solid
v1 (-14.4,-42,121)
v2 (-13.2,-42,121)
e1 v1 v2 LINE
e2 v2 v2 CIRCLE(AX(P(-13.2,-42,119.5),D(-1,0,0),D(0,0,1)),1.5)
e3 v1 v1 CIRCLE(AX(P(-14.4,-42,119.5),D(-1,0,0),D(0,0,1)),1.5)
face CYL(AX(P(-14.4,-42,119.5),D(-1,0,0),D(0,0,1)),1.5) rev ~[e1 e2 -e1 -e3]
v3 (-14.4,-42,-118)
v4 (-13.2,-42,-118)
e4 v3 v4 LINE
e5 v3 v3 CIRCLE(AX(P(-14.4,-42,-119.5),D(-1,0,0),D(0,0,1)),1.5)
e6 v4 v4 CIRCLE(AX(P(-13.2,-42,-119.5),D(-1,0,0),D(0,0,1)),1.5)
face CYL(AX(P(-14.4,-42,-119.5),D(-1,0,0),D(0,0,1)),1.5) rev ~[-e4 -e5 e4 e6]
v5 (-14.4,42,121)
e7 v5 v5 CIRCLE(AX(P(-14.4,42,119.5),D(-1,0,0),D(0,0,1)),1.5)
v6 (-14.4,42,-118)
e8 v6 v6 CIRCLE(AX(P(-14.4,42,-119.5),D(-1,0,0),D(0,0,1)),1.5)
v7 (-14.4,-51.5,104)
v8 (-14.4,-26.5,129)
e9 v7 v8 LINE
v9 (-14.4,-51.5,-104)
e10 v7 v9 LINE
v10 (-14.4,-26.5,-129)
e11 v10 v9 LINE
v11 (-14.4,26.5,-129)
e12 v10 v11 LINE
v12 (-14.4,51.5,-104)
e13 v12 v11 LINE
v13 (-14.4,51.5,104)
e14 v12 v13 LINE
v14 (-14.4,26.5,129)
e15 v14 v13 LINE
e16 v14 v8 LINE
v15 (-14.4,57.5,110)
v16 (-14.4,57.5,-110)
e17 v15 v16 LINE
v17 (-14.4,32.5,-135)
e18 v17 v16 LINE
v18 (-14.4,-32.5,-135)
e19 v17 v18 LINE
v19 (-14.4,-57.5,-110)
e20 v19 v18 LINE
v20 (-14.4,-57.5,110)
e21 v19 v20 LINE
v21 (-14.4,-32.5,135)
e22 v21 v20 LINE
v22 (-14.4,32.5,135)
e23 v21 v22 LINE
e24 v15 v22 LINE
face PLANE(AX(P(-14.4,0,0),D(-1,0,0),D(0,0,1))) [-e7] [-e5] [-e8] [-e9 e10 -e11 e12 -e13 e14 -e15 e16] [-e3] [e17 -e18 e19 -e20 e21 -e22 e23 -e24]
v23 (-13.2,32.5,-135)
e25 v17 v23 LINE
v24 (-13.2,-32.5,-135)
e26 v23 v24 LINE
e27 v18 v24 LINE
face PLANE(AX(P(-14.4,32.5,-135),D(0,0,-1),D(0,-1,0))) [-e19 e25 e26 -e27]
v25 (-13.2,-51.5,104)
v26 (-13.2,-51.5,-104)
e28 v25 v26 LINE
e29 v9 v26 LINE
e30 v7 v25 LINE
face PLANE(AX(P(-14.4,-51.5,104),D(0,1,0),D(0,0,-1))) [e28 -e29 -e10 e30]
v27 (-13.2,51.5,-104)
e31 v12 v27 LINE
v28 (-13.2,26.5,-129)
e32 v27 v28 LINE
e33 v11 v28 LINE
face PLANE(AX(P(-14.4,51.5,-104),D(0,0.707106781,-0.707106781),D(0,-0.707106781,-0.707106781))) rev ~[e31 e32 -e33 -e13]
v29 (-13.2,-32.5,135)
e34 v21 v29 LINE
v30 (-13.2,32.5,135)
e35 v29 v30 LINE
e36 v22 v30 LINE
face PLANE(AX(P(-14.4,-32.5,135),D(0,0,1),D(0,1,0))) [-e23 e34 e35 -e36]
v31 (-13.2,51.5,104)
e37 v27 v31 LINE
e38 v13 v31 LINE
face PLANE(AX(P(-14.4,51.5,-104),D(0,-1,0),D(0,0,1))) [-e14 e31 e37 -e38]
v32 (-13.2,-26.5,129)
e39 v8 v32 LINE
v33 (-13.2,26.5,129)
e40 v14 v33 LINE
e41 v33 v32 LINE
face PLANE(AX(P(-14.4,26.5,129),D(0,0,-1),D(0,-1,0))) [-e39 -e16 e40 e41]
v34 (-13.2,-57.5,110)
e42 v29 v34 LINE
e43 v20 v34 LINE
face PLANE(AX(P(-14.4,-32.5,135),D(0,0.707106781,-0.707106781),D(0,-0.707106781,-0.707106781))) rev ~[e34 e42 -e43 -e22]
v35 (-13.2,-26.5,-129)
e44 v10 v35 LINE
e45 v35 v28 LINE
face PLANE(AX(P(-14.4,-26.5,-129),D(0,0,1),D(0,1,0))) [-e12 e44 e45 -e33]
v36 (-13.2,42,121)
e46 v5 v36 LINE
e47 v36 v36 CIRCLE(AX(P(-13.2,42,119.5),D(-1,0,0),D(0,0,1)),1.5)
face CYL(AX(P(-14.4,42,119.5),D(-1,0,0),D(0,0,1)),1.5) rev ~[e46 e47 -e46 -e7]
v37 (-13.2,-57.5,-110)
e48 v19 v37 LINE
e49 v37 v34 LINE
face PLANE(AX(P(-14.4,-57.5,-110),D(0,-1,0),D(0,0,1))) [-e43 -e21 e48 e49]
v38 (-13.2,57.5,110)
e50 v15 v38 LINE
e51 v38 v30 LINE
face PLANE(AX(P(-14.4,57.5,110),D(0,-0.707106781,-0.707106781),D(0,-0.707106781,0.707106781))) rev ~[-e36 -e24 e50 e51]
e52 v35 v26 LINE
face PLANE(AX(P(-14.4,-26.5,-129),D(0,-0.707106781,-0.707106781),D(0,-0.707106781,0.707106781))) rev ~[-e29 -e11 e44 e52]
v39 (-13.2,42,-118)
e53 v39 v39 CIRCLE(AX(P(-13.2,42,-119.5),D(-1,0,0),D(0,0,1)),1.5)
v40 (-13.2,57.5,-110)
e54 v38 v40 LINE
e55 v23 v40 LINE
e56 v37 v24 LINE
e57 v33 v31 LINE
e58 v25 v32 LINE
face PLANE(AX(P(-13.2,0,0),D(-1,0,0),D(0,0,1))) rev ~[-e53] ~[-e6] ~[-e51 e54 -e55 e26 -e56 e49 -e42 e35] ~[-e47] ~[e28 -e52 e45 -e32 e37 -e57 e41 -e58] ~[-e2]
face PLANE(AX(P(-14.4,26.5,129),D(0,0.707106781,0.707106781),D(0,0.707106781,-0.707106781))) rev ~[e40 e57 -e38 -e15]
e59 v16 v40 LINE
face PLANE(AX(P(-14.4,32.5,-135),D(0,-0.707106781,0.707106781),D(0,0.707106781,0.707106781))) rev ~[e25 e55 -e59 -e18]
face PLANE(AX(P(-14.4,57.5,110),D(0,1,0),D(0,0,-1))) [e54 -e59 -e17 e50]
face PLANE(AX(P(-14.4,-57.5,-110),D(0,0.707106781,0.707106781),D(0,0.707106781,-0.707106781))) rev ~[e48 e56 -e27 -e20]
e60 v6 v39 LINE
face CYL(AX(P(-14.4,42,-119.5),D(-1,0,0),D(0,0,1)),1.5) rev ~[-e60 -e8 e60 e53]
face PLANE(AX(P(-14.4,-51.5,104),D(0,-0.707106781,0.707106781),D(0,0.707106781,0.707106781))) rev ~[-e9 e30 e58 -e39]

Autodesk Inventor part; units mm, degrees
ref_plane "YZ Plane" through (0, 0, 0) normal (1, 0, 0) x (0, 1, 0)
ref_plane "XZ Plane" through (0, 0, 0) normal (0, 1, 0) x (-1, 0, 0)
ref_plane "XY Plane" through (0, 0, 0) normal (0, 0, 1) x (1, 0, 0)
sketch "Sketch1" plane through (0, 0, 0) normal (1, 0, 0) x (0, 1, 0)
  line L0 (-57.5, 135) -> (57.5, 135)
  line L1 (57.5, 135) -> (57.5, -135)
  line L2 (57.5, -135) -> (-57.5, -135)
  line L3 (-57.5, -135) -> (-57.5, 135)
  line L4 (-57.5, 135) -> (57.5, -135) construction
  line L5 (57.5, 135) -> (-57.5, -135) construction
  circle A0 centre (0, 77.5) radius 3.925
  circle A1 centre (0, -77.5) radius 3.925
  circle A2 centre (-15, 0) radius 5
  line L6 (0, 77.5) -> (0, -77.5) construction
  line L7 (51.5, -129) -> (51.5, 129)
  line L8 (51.5, 129) -> (-51.5, 129)
  line L9 (-51.5, 129) -> (-51.5, -129)
  line L10 (-51.5, -129) -> (51.5, -129)
  point P0 (0, 0)
  dimension "d0" = 155
  dimension "d1" = 7.85
  dimension "d2" = 270
  dimension "d3" = 115
  dimension "d4" = 6
  dimension "d35" = 10
  dimension "d36" = 15
extrude "Extrusion1" add sketch "Sketch1" along normal blind 8 contours L0 L1 L2 L3 | A0 | A1 | L10 L9 L8 L7
extrude "Extrusion2" add sketch "Sketch1" against normal blind 14.4 contours L0 L1 L2 L3
sketch "Sketch2" plane through (8, 0, 0) normal (1, 0, 0) x (0, 0, -1)
  line L0 (135, -57.5) -> (135, 57.5) projected
  line L1 (135, 57.5) -> (-135, 57.5) projected
  line L2 (-135, 57.5) -> (-135, -57.5) projected
  line L3 (-135, -57.5) -> (135, -57.5) projected
  line L4 (-33.234, -33.234) -> (33.234, -33.234) construction
  line L5 (33.234, -33.234) -> (33.234, 33.234) construction
  line L6 (33.234, 33.234) -> (-33.234, 33.234) construction
  line L7 (-33.234, 33.234) -> (-33.234, -33.234) construction
  line L8 (-33.234, -33.234) -> (33.234, 33.234) construction
  line L9 (33.234, -33.234) -> (-33.234, 33.234) construction
  circle A0 centre (0, 0) radius 47 construction
  circle A1 centre (33.234, 33.234) radius 2.75
  circle A2 centre (-33.234, 33.234) radius 2.75
  circle A3 centre (0, 0) radius 47 construction
  circle A4 centre (-33.234, -33.234) radius 2.75
  circle A5 centre (0, 0) radius 47 construction
  circle A6 centre (33.234, -33.234) radius 2.75
  circle A7 centre (0, 0) radius 47 construction
  point P0 (0, 0)
  point P1 (0, 0)
  dimension "d12" = 94
  dimension "d13" = 5.5
  dimension "d16" = 360
extrude "Extrusion3" cut sketch "Sketch2" against normal through all contours A1 | A2 | A4 | A6
sketch "Sketch3" plane through (0, 0, 0) normal (-1, 0, 0) x (0, 0, 1)
  circle A0 centre (33.234, -33.234) radius 2.75 projected
  circle A1 centre (33.234, 33.234) radius 2.75 projected
  circle A2 centre (-33.234, -33.234) radius 2.75 projected
  circle A3 centre (-33.234, 33.234) radius 2.75 projected
  line L0 (-129, -51.5) -> (129, -51.5) projected
  line L1 (129, -51.5) -> (129, 51.5) projected
  line L2 (129, 51.5) -> (-129, 51.5) projected
  line L3 (-129, 51.5) -> (-129, -51.5) projected
  circle A4 centre (0, -15) radius 5 projected
  circle A5 centre (-33.234, 33.234) radius 4.5
  circle A6 centre (33.234, 33.234) radius 2.75 projected
  circle A7 centre (33.234, 33.234) radius 4.5
  circle A8 centre (-33.234, -33.234) radius 4.5
  circle A9 centre (33.234, -33.234) radius 4.5
  point P0 (0, 0)
  dimension "d20" = 9
extrude "Extrusion4" cut sketch "Sketch3" against normal blind 3 contours A0 | A1 | A2 | A3 | A5 | A7 | A8 | A9
sketch "Sketch4" plane through (8, 0, 0) normal (1, 0, 0) x (0, 0, -1)
  circle A0 centre (-33.234, -33.234) radius 2.75 projected
  circle A1 centre (-33.234, 33.234) radius 2.75 projected
  circle A2 centre (33.234, -33.234) radius 2.75 projected
  circle A3 centre (33.234, 33.234) radius 2.75 projected
  line L0 (135, -57.5) -> (135, 57.5) projected
  line L1 (135, 57.5) -> (-135, 57.5) projected
  line L2 (-135, 57.5) -> (-135, -57.5) projected
  line L3 (-135, -57.5) -> (135, -57.5) projected
  circle A4 centre (0, -15) radius 5 projected
  circle A5 centre (0, -15) radius 7.5
  point P0 (0, 0)
  dimension "d24" = 15
extrude "Extrusion5" cut sketch "Sketch4" against normal through all contours A4 | A5
chamfer "Chamfer2" distance 25 angle 45 8 edges at (-7.2, 51.5, -129) (-7.2, -51.5, -129) (-7.2, -51.5, 129) (-7.2, 51.5, 129) (-3.2, 57.5, -135) (-3.2, -57.5, -135) (-3.2, -57.5, 135) (-3.2, 57.5, 135)
sketch "Sketch6" plane through (-14.4, 0, 0) normal (-1, 0, 0) x (0, 0, 1)
  line L0 (110, 57.5) -> (135, 32.5) projected
  line L1 (110, 57.5) -> (-110, 57.5) projected
  line L2 (-135, 32.5) -> (-110, 57.5) projected
  line L3 (-135, 32.5) -> (-135, -32.5) projected
  line L4 (-110, -57.5) -> (-135, -32.5) projected
  line L5 (-110, -57.5) -> (110, -57.5) projected
  line L6 (135, -32.5) -> (110, -57.5) projected
  line L7 (135, -32.5) -> (135, 32.5) projected
  line L8 (-129, -26.5) -> (-129, 26.5) projected
  line L9 (-104, 51.5) -> (-129, 26.5) projected
  line L10 (-104, 51.5) -> (104, 51.5) projected
  line L11 (129, 26.5) -> (104, 51.5) projected
  line L12 (129, 26.5) -> (129, -26.5) projected
  line L13 (104, -51.5) -> (129, -26.5) projected
  line L14 (104, -51.5) -> (-104, -51.5) projected
  line L15 (-129, -26.5) -> (-104, -51.5) projected
  line L16 (119.5, -42) -> (-119.5, -42)
  line L17 (-119.5, -42) -> (-119.5, 42)
  line L18 (-119.5, 42) -> (119.5, 42)
  line L19 (119.5, 42) -> (119.5, -42)
  circle A0 centre (0, 0) radius 10.3
  line L20 (119.5, -42) -> (-119.5, 42) construction
  line L21 (-119.5, -42) -> (119.5, 42) construction
  circle A1 centre (-119.5, 42) radius 1.5
  circle A2 centre (-119.5, -42) radius 1.5
  circle A3 centre (119.5, -42) radius 1.5
  circle A4 centre (119.5, 42) radius 1.5
  line L22 (-122.5, 45) -> (-116.5, 39)
  dimension "d32" = 3
extrude "Extrusion7" cut sketch "Sketch6" against normal through all contours A2 L16 L17 | L17 L16 A2 | A1 L22 L17 | L17 L22 A1 | L22 L18 A1 | L22 A1 L18 | A3 L19 L16 | L16 L19 A3 | A4 L19 L18 | L18 L19 A4
sketch "Sketch12" plane through (0, 0, 0) normal (-1, 0, 0) x (0, 0, 1)
  circle A0 centre (-77.5, 0) radius 3.925 projected
  circle A1 centre (77.5, 0) radius 3.925 projected
  circle A2 centre (-77.5, 0) radius 11.15
  circle A3 centre (77.5, 0) radius 11.15
  point P0 (0, 0)
  dimension "d61" = 22.3
extrude "Extrusion13" cut sketch "Sketch12" against normal blind 5 contours A0 | A1 | A2 | A3
sketch "Sketch13" plane through (5, 0, -77.5) normal (-1, 0, 0) x (0, 0, 1)
  circle A0 centre (0, 0) radius 11.15 projected
  circle A1 centre (155, 0) radius 11.15 projected
  circle A2 centre (0, 0) radius 8.5
  circle A3 centre (155, 0) radius 8.5
  point P0 (77.5, 0)
  dimension "d64" = 17
  dimension "d65" = 17
extrude "Extrusion14" cut sketch "Sketch13" against normal through all contours A2 | A3
sketch "Sketch14" plane through (0, 0, 0) normal (-1, 0, 0) x (0, 0, 1)
  circle A0 centre (0, -15) radius 7.5 projected
  circle A1 centre (0, -15) radius 9.65
  point P0 (0, 0)
  dimension "d68" = 19.3
extrude "Extrusion15" cut sketch "Sketch14" against normal blind 3
ref_plane "Work Plane1" through (-8.4, 0, 0) normal (-1, 0, 0) x (0, 0, 1)
sketch "Sketch15" plane through (-8.4, 0, 0) normal (-1, 0, 0) x (0, 0, 1)
  circle A0 centre (-119.5, 42) radius 1.5 projected
  line L0 (-120.3667, 45.2345) -> (-117.1322, 44.3678)
  line L1 (-117.1322, 44.3678) -> (-116.2655, 41.1333)
  line L2 (-116.2655, 41.1333) -> (-118.6333, 38.7655)
  line L3 (-118.6333, 38.7655) -> (-121.8678, 39.6322)
  line L4 (-121.8678, 39.6322) -> (-122.7345, 42.8667)
  line L5 (-122.7345, 42.8667) -> (-120.3667, 45.2345)
  line L6 (-135, 32.5) -> (-110, 57.5) projected
  line L7 (-117.1322, 44.3678) -> (-120.1322, 47.3678)
  line L8 (-121.8678, 39.6322) -> (-124.8678, 42.6322)
  point P0 (0, 0)
  dimension "d72" = 5.8
extrude "Extrusion16" cut sketch "Sketch15" along normal blind 3
mirror "Mirror1" about plane through (0, 0, 0) normal (0, 1, 0) of "Extrusion16"
mirror "Mirror2" about plane through (0, 0, 0) normal (0, 0, 1) of "Extrusion16", "Mirror1"
sketch "Sketch16" plane through (0, 0, 0) normal (-1, 0, 0) x (0, 0, 1)
  circle A0 centre (-21.0923, 23.1558) radius 4
  circle A1 centre (-37.6476, -46.4615) radius 4
  circle A2 centre (0, -15) radius 9.65 projected
  circle A3 centre (77.5, 0) radius 11.15 projected
  circle A4 centre (-77.5, 0) radius 11.15 projected
  line L0 (129, 26.5) -> (104, 51.5) projected
  line L1 (104, 51.5) -> (-104, 51.5) projected
  line L2 (-104, 51.5) -> (-129, 26.5) projected
  line L3 (-129, 26.5) -> (-129, -26.5) projected
  line L4 (-129, -26.5) -> (-104, -51.5) projected
  line L5 (-104, -51.5) -> (104, -51.5) projected
  line L6 (104, -51.5) -> (129, -26.5) projected
  line L7 (129, -26.5) -> (129, 26.5) projected
  circle A5 centre (-33.234, -33.234) radius 4.5 projected
  circle A6 centre (33.234, 33.234) radius 4.5 projected
  circle A7 centre (33.234, -33.234) radius 4.5 projected
  circle A8 centre (-33.234, 33.234) radius 4.5 projected
  line L8 (0, 0) -> (0, 21.7983)
  circle A9 centre (21.0923, 23.1558) radius 4
  circle A10 centre (37.6476, -46.4615) radius 4
  dimension "d75" = 8
  dimension "d76" = 8
extrude "Extrusion17" add sketch "Sketch16" along normal up to surface (14.4 mm away) contours A0 | A1 | A9 | A10
sketch "Sketch17" plane through (-14.4, 23.1558, -21.0923) normal (-1, 0, 0) x (0, 0, 1)
  circle A0 centre (0, 0) radius 4 projected
  circle A1 centre (42.1847, 0) radius 4 projected
  circle A2 centre (-16.5553, -69.6173) radius 4 projected
  circle A3 centre (58.7399, -69.6173) radius 4 projected
  circle A4 centre (-16.5553, -69.6173) radius 1.5
  circle A5 centre (58.7399, -69.6173) radius 1.5
  circle A6 centre (0, 0) radius 1.5
  circle A7 centre (42.1847, 0) radius 1.5
  point P0 (21.0923, -23.1558)
  dimension "d79" = 3
extrude "Extrusion18" cut sketch "Sketch17" against normal through all contours A4 | A5 | A6 | A7
chamfer "Chamfer3" distance 3 angle 75 4 edges at (0, -46.4615, -41.6476) (0, 23.1558, -25.0923) (0, 23.1558, 17.0923) (0, -46.4615, 33.6476)
sketch "Sketch18" plane through (-14.4, 0, 0) normal (-1, 0, 0) x (0, 0, 1)
  line L0 (-382.8162, -193.5683) -> (382.8162, -193.5683)
  line L1 (382.8162, -193.5683) -> (382.8162, 193.5683)
  line L2 (382.8162, 193.5683) -> (-382.8162, 193.5683)
  line L3 (-382.8162, 193.5683) -> (-382.8162, -193.5683)
  line L4 (-382.8162, -193.5683) -> (382.8162, 193.5683) construction
  line L5 (382.8162, -193.5683) -> (-382.8162, 193.5683) construction
  circle A0 centre (119.5, -42) radius 1.5 projected
  circle A1 centre (-119.5, -42) radius 1.5 projected
  circle A2 centre (119.5, 42) radius 1.5 projected
  circle A3 centre (-119.5, 42) radius 1.5 projected
  line L6 (110, 57.5) -> (135, 32.5) projected
  line L7 (110, 57.5) -> (-110, 57.5) projected
  line L8 (-135, 32.5) -> (-110, 57.5) projected
  line L9 (-135, 32.5) -> (-135, -32.5) projected
  line L10 (-110, -57.5) -> (-135, -32.5) projected
  line L11 (-110, -57.5) -> (110, -57.5) projected
  line L12 (135, -32.5) -> (110, -57.5) projected
  line L13 (135, -32.5) -> (135, 32.5) projected
  line L14 (-129, -26.5) -> (-129, 26.5) projected
  line L15 (-104, 51.5) -> (-129, 26.5) projected
  line L16 (-104, 51.5) -> (104, 51.5) projected
  line L17 (129, 26.5) -> (104, 51.5) projected
  line L18 (129, 26.5) -> (129, -26.5) projected
  line L19 (104, -51.5) -> (129, -26.5) projected
  line L20 (104, -51.5) -> (-104, -51.5) projected
  line L21 (-129, -26.5) -> (-104, -51.5) projected
  point P0 (0, 0)
extrude "Extrusion19" cut sketch "Sketch18" against normal blind 22.4 contours L3 L2 L1 L0 | A0 | A1 | A2 | A3 | L6 L13 L12 L11 L10 L9 L8 L7 | L14 L15 L16 L17 L18 L19 L20 L21
extrude "Extrusion20" add sketch "Sketch18" against normal blind 1.2 contours L6 L13 L12 L11 L10 L9 L8 L7
properties part number "CAJA" material "Steel, Mild, Welded"
